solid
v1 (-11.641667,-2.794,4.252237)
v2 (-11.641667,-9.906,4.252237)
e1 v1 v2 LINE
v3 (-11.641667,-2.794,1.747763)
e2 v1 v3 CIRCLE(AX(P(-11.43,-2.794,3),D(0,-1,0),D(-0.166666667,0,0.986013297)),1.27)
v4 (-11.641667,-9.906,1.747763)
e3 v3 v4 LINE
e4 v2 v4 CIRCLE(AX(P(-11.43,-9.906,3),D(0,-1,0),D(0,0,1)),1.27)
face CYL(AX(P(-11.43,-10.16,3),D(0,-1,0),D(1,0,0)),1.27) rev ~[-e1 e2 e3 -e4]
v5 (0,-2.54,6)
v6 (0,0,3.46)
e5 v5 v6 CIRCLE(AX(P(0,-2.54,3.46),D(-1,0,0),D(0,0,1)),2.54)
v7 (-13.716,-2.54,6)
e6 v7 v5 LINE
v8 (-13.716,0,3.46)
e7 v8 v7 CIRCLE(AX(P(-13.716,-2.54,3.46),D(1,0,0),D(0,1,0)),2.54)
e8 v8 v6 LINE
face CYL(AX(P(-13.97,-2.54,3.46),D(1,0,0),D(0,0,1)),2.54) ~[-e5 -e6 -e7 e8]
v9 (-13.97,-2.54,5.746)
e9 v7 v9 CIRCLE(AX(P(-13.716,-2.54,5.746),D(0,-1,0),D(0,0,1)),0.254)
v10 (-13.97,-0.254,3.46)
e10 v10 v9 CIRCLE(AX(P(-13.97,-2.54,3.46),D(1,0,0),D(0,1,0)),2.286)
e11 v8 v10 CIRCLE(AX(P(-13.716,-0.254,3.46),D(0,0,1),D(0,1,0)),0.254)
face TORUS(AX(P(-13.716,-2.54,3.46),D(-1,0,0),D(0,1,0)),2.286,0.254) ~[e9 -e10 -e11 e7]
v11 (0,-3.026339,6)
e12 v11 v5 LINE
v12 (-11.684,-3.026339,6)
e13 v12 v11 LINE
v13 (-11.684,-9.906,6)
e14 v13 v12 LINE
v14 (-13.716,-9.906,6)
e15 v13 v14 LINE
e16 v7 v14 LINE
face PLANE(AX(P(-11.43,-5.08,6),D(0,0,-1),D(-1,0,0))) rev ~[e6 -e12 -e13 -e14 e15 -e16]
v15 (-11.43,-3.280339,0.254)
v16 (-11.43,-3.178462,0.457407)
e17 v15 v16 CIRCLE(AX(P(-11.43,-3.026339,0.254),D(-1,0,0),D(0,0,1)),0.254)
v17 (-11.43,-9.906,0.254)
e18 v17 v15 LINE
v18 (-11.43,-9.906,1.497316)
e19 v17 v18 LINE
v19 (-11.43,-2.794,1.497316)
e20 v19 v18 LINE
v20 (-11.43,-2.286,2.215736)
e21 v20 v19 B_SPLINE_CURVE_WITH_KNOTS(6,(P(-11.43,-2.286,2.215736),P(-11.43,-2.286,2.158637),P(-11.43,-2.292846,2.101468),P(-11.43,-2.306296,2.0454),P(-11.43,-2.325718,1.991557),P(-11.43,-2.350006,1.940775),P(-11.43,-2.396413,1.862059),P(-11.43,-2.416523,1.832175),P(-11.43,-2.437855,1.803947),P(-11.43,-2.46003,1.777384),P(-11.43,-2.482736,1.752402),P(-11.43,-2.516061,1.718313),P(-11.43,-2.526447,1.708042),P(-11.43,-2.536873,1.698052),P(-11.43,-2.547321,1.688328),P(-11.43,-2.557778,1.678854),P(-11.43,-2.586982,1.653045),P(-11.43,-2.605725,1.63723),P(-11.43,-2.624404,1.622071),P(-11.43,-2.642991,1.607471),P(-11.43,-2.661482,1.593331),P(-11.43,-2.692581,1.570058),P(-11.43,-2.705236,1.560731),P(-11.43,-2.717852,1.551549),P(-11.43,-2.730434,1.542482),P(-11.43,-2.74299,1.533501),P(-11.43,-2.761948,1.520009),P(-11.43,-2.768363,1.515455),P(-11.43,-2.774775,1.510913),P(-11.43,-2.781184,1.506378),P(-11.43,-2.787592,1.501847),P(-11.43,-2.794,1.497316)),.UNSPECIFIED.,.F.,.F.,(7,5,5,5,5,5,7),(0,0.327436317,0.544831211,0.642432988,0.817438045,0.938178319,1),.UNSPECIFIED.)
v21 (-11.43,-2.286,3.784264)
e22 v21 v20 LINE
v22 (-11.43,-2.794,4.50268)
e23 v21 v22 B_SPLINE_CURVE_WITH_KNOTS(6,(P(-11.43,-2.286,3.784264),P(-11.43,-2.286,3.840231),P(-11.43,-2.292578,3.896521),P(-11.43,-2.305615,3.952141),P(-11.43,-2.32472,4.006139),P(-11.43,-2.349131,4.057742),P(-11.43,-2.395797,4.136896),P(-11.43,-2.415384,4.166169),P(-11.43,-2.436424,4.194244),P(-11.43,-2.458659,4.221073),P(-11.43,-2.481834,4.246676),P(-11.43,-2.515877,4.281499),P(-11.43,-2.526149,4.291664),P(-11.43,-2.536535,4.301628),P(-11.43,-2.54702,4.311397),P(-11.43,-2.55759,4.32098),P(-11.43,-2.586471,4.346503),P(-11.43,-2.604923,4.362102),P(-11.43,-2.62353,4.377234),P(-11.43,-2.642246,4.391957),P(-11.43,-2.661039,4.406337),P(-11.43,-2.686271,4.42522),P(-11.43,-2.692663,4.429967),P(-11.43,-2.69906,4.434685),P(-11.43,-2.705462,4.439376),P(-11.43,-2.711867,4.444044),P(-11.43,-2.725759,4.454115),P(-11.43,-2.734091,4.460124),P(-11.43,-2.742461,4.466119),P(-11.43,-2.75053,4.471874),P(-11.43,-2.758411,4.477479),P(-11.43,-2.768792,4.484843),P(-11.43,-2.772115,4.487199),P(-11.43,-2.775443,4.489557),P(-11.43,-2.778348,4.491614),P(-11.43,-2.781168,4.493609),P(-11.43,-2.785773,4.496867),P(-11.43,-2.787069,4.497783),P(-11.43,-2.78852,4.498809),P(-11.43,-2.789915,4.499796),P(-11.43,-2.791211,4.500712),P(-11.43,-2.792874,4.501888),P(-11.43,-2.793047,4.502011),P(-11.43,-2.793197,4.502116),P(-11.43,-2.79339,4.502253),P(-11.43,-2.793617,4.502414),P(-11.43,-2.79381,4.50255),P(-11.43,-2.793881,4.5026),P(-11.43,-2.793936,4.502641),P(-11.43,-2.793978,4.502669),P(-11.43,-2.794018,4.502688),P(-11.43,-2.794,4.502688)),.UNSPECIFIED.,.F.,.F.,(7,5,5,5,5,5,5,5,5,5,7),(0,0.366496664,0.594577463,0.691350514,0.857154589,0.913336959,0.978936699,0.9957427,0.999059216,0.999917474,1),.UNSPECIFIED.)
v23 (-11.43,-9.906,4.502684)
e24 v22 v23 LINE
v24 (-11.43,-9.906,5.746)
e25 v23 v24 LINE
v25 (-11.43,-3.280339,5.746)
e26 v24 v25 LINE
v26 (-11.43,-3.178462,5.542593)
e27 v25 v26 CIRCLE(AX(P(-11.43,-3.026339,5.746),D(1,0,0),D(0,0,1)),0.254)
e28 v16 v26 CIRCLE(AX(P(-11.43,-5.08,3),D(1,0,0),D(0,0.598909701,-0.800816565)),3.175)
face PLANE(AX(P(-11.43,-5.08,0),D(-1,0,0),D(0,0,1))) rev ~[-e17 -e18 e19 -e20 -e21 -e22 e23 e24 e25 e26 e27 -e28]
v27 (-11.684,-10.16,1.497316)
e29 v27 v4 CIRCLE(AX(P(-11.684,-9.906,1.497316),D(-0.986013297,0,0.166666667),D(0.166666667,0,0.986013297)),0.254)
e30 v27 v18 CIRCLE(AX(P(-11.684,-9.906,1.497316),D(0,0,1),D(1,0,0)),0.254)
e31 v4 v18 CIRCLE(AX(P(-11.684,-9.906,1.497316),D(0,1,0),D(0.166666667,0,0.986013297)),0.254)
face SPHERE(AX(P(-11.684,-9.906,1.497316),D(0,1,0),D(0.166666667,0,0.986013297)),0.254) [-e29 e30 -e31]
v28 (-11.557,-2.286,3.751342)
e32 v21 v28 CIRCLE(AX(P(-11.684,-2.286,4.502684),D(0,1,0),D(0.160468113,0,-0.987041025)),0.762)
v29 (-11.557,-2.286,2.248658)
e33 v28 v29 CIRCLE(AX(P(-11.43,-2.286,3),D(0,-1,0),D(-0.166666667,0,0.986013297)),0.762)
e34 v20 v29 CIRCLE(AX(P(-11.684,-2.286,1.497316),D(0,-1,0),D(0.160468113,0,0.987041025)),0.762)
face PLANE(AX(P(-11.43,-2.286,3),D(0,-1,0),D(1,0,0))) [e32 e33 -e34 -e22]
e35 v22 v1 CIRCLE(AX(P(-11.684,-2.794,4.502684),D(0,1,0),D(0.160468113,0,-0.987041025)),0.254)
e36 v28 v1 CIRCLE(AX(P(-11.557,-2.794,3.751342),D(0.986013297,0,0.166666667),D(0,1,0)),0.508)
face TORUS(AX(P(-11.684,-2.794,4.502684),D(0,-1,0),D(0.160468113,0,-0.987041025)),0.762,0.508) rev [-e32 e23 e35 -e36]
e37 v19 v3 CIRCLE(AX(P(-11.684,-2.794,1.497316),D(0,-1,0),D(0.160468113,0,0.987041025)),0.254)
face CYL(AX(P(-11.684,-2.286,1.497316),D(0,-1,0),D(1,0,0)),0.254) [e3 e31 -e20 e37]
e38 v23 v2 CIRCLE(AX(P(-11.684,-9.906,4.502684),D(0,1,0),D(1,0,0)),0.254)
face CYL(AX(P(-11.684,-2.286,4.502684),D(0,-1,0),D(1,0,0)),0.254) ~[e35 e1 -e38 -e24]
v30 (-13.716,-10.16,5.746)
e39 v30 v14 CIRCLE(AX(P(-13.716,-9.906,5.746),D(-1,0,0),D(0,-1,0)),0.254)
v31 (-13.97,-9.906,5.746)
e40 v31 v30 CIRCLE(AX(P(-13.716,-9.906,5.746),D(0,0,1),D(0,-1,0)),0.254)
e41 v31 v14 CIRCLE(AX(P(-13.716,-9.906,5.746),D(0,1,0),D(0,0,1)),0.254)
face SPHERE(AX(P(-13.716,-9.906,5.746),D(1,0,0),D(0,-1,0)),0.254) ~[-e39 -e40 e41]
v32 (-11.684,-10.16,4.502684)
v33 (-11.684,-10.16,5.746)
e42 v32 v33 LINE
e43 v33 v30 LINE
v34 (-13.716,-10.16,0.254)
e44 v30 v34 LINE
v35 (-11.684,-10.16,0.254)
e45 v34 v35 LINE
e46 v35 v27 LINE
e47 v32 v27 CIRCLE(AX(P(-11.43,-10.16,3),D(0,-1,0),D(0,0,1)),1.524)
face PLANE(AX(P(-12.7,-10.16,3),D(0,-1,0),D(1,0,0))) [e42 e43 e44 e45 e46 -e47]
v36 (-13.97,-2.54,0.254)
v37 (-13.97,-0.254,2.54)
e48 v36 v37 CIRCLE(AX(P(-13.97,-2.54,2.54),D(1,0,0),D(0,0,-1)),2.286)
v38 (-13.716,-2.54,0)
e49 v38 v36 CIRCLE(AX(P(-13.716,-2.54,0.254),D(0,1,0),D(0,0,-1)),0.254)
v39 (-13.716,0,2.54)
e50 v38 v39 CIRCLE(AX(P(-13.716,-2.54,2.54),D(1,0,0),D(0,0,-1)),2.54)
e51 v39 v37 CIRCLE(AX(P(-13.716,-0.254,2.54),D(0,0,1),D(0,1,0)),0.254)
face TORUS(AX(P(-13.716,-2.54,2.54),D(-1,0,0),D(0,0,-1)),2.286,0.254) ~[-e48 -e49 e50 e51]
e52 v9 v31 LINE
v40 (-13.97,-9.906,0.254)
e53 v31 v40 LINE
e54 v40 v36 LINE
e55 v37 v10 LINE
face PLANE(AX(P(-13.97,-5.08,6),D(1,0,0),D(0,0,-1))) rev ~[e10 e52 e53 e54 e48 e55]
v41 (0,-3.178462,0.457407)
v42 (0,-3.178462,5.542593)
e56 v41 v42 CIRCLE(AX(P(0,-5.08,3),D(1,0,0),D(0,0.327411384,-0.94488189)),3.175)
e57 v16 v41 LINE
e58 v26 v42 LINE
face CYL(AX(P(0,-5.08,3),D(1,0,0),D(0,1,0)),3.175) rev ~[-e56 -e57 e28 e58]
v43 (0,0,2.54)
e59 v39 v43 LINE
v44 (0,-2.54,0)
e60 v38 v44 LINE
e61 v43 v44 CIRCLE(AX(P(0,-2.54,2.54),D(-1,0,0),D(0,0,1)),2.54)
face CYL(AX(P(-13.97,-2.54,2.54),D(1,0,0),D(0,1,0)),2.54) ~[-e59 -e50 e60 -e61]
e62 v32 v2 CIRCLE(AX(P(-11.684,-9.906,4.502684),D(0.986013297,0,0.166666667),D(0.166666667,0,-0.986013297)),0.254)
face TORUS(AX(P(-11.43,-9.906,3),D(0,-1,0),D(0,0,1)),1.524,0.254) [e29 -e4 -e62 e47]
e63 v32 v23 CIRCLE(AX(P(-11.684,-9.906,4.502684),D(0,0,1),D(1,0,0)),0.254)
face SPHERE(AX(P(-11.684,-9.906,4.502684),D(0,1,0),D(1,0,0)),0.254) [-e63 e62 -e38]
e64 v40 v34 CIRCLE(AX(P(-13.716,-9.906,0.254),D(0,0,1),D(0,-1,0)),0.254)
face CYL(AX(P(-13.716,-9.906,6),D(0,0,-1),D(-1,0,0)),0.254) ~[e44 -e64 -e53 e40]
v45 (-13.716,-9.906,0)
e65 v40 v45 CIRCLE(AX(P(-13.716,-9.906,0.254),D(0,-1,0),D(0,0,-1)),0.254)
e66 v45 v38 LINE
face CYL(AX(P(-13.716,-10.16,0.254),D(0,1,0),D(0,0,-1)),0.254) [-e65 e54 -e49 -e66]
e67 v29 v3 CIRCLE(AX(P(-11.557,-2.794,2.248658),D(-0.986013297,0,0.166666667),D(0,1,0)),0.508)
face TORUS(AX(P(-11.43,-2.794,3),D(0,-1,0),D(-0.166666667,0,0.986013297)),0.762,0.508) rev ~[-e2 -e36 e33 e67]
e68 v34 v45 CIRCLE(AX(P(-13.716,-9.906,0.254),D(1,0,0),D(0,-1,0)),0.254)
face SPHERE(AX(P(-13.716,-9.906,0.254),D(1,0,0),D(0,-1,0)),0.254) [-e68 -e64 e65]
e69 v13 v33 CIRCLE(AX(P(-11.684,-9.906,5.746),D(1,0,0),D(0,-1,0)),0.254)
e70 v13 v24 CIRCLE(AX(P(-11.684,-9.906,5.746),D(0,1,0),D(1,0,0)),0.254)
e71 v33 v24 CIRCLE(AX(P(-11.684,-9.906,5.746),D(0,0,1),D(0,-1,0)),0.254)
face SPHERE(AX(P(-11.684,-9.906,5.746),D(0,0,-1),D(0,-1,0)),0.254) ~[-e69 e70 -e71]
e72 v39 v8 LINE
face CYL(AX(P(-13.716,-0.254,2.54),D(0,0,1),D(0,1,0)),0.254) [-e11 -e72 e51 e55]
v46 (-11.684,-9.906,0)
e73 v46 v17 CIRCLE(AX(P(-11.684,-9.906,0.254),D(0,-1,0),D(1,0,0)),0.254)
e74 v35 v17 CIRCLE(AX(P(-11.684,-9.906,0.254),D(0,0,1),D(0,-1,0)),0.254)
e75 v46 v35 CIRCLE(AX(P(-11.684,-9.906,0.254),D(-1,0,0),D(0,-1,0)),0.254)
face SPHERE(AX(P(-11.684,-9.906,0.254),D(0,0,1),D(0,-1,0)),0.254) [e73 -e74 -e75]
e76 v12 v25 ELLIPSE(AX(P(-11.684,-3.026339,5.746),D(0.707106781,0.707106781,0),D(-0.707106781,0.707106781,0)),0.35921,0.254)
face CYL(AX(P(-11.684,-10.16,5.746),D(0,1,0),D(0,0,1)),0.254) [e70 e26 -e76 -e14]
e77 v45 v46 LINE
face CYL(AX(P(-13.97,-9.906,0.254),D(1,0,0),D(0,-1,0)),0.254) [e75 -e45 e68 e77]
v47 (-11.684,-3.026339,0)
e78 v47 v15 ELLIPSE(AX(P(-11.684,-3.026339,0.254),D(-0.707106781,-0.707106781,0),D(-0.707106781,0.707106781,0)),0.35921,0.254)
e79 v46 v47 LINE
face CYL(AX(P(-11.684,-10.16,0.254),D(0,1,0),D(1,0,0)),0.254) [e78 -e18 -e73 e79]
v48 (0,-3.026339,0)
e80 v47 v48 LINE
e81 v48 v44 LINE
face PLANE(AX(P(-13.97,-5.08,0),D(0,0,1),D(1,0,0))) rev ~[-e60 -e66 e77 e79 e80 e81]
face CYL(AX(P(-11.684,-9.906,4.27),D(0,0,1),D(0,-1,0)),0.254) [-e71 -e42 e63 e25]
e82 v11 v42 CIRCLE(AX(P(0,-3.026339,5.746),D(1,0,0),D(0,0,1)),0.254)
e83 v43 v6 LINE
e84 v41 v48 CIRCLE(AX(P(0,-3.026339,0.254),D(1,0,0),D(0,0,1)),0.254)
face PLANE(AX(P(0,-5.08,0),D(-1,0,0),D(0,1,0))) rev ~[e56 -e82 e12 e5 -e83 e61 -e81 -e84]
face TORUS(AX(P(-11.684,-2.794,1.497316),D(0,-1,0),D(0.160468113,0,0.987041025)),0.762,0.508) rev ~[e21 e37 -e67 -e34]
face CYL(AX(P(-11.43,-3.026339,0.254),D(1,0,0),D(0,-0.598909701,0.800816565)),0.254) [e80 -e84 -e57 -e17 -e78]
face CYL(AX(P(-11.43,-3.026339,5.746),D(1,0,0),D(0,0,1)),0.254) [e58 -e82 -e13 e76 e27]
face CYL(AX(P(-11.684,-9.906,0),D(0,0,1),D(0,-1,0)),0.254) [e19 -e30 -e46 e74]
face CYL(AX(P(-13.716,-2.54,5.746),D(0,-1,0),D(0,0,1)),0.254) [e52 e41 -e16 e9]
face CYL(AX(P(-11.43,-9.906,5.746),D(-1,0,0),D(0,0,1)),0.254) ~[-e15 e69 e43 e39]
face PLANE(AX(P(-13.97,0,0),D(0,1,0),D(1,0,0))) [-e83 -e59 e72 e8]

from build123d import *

# Parameters (mm, degrees)
F0_W          = 13.97
F0_H          = 5.08
F1_DEPTH      = 6
F3_DEPTH      = 5.08
F4_R          = 3.175
F5_DEPTH      = 11.43
F6_R          = 1.27
F7_DEPTH      = 7.874
F8_R          = 2.54
F9_R          = 0.254
F10_T2_ANGLE  = 160.8118635463
F10_T6_ANGLE  = 359.64
F10_T11_ANGLE = 359.64


# Not quite as in the source:
# - a fillet or chamfer that OpenCascade refuses, or shapes differently, is made with other operations: its cross-section is extruded or revolved along the edge and cut away or added


with BuildPart() as f1:
    # F0 (on Top) → F1 (new body)
    with BuildSketch(Plane.XY):
        with Locations((-6.985, -2.54)):
            Rectangle(F0_W, F0_H)
    extrude(amount=F1_DEPTH)

    # F2 (on face) → F3 (join)
    with BuildSketch(Plane.XZ.offset(5.08)):
        Polygon((-11.43, 6), (-13.97, 6), (-13.97, 0), (-11.43, 0), (-11.43, 1.7556592107), align=None)
    extrude(amount=F3_DEPTH)

    # F4 (on face) → F5 (cut)
    with BuildSketch(Plane.YZ):
        with Locations((-5.08, 3)):
            Circle(F4_R)
    extrude(amount=-F5_DEPTH, mode=Mode.SUBTRACT)

    # F6 (on face) → F7 (cut)
    with BuildSketch(Plane.XZ.offset(10.16)):
        with Locations((-11.43, 3)):
            Circle(F6_R)
    extrude(amount=-F7_DEPTH, mode=Mode.SUBTRACT)

    # F8
    f8_edges = [f1.edges().sort_by_distance(p)[0] for p in [
        (-6.985, 0, 6),
        (-6.985, 0, 0),
    ]]
    fillet(f8_edges, radius=F8_R)

    # F9
    f9_edges = [f1.edges().sort_by_distance(p)[0] for p in [
        (-11.43, -10.16, 5.135),
        (-12.7, -10.16, 6),
        (-12.7, -10.16, 3),
        (-11.43, -10.16, 0.865),
        (-12.7, -10.16, 0),
        (-13.97, -10.16, 3),
        (-13.97, -6.35, 6),
        (-11.43, -7.100234, 6),
        (-11.43, -7.100234, 0),
        (-11.43, -6.223, 1.73),
        (-11.43, -6.223, 4.27),
        (-5.715, -4.040469, 6),
        (-5.715, -4.040469, 0),
        (-13.97, -6.35, 0),
        (-13.97, -0.743949, 0.743949),
        (-13.97, 0, 3),
        (-13.97, -0.743949, 5.256051),
    ]]
    fillet(f9_edges, radius=F9_R)

    # F10: fillet of radius 0.508 on 1 edges, made by hand

    # F10_s1 → F10_t2 (revolve)
    with BuildSketch(Plane(origin=(-10.6194933514, 0, -1.7950219978), x_dir=(0, 1, 0), z_dir=(0.9860132972, 0, 0.1666666667))):
        with BuildLine():
            ThreePointArc((-2.286, 5.6250398915), (-2.4347897552, 5.9842501364), (-2.794, 6.1330398915))
            Line((-2.794, 6.1330398915), (-2.286, 6.1330398915))
            Line((-2.286, 6.1330398915), (-2.286, 5.6250398915))
        make_face()
    revolve(axis=Axis((-11.43, -2.286, 3), (0, -1, 0)), revolution_arc=F10_T2_ANGLE)


with BuildPart() as f10_tool4:
    # F10_s5 → F10_t6 (revolve)
    with BuildSketch(Plane(origin=(-10.6699629137, 0, -1.7346683419), x_dir=(0, 1, 0), z_dir=(0.9870410248, 0, 0.1604681133))):
        with BuildLine():
            ThreePointArc((-2.794, 6.065243527), (-2.4347897552, 5.9164537719), (-2.286, 5.557243527))
            Line((-2.286, 5.557243527), (-2.286, 6.065243527))
            Line((-2.286, 6.065243527), (-2.794, 6.065243527))
        make_face()
    revolve(axis=Axis((-11.684, -2.286, 4.5026842649), (0, 1, 0)), revolution_arc=F10_T6_ANGLE)

    split(bisect_by=Plane.YZ.offset(-11.43), keep=Keep.BOTTOM)


with BuildPart() as f1_1:
    add(f1.part)

    # F10_t3: union F10_tool4
    add(f10_tool4.part)


with BuildPart() as f10_tool9:
    # F10_s10 → F10_t11 (revolve)
    with BuildSketch(Plane(origin=(-11.6202945797, 0, 1.8891684342), x_dir=(0, 1, 0), z_dir=(0.9870410248, 0, -0.1604681133))):
        with BuildLine():
            ThreePointArc((-2.794, -0.1429973783), (-2.4347897552, 0.0057923768), (-2.286, 0.3650026217))
            Line((-2.286, 0.3650026217), (-2.286, -0.1429973783))
            Line((-2.286, -0.1429973783), (-2.794, -0.1429973783))
        make_face()
    revolve(axis=Axis((-11.684, -2.286, 1.4973157351), (0, -1, 0)), revolution_arc=F10_T11_ANGLE)

    split(bisect_by=Plane.YZ.offset(-11.43), keep=Keep.BOTTOM)


with BuildPart() as f1_2:
    add(f1_1.part)

    # F10_t8: union F10_tool9
    add(f10_tool9.part)


solid = f1_2.part
